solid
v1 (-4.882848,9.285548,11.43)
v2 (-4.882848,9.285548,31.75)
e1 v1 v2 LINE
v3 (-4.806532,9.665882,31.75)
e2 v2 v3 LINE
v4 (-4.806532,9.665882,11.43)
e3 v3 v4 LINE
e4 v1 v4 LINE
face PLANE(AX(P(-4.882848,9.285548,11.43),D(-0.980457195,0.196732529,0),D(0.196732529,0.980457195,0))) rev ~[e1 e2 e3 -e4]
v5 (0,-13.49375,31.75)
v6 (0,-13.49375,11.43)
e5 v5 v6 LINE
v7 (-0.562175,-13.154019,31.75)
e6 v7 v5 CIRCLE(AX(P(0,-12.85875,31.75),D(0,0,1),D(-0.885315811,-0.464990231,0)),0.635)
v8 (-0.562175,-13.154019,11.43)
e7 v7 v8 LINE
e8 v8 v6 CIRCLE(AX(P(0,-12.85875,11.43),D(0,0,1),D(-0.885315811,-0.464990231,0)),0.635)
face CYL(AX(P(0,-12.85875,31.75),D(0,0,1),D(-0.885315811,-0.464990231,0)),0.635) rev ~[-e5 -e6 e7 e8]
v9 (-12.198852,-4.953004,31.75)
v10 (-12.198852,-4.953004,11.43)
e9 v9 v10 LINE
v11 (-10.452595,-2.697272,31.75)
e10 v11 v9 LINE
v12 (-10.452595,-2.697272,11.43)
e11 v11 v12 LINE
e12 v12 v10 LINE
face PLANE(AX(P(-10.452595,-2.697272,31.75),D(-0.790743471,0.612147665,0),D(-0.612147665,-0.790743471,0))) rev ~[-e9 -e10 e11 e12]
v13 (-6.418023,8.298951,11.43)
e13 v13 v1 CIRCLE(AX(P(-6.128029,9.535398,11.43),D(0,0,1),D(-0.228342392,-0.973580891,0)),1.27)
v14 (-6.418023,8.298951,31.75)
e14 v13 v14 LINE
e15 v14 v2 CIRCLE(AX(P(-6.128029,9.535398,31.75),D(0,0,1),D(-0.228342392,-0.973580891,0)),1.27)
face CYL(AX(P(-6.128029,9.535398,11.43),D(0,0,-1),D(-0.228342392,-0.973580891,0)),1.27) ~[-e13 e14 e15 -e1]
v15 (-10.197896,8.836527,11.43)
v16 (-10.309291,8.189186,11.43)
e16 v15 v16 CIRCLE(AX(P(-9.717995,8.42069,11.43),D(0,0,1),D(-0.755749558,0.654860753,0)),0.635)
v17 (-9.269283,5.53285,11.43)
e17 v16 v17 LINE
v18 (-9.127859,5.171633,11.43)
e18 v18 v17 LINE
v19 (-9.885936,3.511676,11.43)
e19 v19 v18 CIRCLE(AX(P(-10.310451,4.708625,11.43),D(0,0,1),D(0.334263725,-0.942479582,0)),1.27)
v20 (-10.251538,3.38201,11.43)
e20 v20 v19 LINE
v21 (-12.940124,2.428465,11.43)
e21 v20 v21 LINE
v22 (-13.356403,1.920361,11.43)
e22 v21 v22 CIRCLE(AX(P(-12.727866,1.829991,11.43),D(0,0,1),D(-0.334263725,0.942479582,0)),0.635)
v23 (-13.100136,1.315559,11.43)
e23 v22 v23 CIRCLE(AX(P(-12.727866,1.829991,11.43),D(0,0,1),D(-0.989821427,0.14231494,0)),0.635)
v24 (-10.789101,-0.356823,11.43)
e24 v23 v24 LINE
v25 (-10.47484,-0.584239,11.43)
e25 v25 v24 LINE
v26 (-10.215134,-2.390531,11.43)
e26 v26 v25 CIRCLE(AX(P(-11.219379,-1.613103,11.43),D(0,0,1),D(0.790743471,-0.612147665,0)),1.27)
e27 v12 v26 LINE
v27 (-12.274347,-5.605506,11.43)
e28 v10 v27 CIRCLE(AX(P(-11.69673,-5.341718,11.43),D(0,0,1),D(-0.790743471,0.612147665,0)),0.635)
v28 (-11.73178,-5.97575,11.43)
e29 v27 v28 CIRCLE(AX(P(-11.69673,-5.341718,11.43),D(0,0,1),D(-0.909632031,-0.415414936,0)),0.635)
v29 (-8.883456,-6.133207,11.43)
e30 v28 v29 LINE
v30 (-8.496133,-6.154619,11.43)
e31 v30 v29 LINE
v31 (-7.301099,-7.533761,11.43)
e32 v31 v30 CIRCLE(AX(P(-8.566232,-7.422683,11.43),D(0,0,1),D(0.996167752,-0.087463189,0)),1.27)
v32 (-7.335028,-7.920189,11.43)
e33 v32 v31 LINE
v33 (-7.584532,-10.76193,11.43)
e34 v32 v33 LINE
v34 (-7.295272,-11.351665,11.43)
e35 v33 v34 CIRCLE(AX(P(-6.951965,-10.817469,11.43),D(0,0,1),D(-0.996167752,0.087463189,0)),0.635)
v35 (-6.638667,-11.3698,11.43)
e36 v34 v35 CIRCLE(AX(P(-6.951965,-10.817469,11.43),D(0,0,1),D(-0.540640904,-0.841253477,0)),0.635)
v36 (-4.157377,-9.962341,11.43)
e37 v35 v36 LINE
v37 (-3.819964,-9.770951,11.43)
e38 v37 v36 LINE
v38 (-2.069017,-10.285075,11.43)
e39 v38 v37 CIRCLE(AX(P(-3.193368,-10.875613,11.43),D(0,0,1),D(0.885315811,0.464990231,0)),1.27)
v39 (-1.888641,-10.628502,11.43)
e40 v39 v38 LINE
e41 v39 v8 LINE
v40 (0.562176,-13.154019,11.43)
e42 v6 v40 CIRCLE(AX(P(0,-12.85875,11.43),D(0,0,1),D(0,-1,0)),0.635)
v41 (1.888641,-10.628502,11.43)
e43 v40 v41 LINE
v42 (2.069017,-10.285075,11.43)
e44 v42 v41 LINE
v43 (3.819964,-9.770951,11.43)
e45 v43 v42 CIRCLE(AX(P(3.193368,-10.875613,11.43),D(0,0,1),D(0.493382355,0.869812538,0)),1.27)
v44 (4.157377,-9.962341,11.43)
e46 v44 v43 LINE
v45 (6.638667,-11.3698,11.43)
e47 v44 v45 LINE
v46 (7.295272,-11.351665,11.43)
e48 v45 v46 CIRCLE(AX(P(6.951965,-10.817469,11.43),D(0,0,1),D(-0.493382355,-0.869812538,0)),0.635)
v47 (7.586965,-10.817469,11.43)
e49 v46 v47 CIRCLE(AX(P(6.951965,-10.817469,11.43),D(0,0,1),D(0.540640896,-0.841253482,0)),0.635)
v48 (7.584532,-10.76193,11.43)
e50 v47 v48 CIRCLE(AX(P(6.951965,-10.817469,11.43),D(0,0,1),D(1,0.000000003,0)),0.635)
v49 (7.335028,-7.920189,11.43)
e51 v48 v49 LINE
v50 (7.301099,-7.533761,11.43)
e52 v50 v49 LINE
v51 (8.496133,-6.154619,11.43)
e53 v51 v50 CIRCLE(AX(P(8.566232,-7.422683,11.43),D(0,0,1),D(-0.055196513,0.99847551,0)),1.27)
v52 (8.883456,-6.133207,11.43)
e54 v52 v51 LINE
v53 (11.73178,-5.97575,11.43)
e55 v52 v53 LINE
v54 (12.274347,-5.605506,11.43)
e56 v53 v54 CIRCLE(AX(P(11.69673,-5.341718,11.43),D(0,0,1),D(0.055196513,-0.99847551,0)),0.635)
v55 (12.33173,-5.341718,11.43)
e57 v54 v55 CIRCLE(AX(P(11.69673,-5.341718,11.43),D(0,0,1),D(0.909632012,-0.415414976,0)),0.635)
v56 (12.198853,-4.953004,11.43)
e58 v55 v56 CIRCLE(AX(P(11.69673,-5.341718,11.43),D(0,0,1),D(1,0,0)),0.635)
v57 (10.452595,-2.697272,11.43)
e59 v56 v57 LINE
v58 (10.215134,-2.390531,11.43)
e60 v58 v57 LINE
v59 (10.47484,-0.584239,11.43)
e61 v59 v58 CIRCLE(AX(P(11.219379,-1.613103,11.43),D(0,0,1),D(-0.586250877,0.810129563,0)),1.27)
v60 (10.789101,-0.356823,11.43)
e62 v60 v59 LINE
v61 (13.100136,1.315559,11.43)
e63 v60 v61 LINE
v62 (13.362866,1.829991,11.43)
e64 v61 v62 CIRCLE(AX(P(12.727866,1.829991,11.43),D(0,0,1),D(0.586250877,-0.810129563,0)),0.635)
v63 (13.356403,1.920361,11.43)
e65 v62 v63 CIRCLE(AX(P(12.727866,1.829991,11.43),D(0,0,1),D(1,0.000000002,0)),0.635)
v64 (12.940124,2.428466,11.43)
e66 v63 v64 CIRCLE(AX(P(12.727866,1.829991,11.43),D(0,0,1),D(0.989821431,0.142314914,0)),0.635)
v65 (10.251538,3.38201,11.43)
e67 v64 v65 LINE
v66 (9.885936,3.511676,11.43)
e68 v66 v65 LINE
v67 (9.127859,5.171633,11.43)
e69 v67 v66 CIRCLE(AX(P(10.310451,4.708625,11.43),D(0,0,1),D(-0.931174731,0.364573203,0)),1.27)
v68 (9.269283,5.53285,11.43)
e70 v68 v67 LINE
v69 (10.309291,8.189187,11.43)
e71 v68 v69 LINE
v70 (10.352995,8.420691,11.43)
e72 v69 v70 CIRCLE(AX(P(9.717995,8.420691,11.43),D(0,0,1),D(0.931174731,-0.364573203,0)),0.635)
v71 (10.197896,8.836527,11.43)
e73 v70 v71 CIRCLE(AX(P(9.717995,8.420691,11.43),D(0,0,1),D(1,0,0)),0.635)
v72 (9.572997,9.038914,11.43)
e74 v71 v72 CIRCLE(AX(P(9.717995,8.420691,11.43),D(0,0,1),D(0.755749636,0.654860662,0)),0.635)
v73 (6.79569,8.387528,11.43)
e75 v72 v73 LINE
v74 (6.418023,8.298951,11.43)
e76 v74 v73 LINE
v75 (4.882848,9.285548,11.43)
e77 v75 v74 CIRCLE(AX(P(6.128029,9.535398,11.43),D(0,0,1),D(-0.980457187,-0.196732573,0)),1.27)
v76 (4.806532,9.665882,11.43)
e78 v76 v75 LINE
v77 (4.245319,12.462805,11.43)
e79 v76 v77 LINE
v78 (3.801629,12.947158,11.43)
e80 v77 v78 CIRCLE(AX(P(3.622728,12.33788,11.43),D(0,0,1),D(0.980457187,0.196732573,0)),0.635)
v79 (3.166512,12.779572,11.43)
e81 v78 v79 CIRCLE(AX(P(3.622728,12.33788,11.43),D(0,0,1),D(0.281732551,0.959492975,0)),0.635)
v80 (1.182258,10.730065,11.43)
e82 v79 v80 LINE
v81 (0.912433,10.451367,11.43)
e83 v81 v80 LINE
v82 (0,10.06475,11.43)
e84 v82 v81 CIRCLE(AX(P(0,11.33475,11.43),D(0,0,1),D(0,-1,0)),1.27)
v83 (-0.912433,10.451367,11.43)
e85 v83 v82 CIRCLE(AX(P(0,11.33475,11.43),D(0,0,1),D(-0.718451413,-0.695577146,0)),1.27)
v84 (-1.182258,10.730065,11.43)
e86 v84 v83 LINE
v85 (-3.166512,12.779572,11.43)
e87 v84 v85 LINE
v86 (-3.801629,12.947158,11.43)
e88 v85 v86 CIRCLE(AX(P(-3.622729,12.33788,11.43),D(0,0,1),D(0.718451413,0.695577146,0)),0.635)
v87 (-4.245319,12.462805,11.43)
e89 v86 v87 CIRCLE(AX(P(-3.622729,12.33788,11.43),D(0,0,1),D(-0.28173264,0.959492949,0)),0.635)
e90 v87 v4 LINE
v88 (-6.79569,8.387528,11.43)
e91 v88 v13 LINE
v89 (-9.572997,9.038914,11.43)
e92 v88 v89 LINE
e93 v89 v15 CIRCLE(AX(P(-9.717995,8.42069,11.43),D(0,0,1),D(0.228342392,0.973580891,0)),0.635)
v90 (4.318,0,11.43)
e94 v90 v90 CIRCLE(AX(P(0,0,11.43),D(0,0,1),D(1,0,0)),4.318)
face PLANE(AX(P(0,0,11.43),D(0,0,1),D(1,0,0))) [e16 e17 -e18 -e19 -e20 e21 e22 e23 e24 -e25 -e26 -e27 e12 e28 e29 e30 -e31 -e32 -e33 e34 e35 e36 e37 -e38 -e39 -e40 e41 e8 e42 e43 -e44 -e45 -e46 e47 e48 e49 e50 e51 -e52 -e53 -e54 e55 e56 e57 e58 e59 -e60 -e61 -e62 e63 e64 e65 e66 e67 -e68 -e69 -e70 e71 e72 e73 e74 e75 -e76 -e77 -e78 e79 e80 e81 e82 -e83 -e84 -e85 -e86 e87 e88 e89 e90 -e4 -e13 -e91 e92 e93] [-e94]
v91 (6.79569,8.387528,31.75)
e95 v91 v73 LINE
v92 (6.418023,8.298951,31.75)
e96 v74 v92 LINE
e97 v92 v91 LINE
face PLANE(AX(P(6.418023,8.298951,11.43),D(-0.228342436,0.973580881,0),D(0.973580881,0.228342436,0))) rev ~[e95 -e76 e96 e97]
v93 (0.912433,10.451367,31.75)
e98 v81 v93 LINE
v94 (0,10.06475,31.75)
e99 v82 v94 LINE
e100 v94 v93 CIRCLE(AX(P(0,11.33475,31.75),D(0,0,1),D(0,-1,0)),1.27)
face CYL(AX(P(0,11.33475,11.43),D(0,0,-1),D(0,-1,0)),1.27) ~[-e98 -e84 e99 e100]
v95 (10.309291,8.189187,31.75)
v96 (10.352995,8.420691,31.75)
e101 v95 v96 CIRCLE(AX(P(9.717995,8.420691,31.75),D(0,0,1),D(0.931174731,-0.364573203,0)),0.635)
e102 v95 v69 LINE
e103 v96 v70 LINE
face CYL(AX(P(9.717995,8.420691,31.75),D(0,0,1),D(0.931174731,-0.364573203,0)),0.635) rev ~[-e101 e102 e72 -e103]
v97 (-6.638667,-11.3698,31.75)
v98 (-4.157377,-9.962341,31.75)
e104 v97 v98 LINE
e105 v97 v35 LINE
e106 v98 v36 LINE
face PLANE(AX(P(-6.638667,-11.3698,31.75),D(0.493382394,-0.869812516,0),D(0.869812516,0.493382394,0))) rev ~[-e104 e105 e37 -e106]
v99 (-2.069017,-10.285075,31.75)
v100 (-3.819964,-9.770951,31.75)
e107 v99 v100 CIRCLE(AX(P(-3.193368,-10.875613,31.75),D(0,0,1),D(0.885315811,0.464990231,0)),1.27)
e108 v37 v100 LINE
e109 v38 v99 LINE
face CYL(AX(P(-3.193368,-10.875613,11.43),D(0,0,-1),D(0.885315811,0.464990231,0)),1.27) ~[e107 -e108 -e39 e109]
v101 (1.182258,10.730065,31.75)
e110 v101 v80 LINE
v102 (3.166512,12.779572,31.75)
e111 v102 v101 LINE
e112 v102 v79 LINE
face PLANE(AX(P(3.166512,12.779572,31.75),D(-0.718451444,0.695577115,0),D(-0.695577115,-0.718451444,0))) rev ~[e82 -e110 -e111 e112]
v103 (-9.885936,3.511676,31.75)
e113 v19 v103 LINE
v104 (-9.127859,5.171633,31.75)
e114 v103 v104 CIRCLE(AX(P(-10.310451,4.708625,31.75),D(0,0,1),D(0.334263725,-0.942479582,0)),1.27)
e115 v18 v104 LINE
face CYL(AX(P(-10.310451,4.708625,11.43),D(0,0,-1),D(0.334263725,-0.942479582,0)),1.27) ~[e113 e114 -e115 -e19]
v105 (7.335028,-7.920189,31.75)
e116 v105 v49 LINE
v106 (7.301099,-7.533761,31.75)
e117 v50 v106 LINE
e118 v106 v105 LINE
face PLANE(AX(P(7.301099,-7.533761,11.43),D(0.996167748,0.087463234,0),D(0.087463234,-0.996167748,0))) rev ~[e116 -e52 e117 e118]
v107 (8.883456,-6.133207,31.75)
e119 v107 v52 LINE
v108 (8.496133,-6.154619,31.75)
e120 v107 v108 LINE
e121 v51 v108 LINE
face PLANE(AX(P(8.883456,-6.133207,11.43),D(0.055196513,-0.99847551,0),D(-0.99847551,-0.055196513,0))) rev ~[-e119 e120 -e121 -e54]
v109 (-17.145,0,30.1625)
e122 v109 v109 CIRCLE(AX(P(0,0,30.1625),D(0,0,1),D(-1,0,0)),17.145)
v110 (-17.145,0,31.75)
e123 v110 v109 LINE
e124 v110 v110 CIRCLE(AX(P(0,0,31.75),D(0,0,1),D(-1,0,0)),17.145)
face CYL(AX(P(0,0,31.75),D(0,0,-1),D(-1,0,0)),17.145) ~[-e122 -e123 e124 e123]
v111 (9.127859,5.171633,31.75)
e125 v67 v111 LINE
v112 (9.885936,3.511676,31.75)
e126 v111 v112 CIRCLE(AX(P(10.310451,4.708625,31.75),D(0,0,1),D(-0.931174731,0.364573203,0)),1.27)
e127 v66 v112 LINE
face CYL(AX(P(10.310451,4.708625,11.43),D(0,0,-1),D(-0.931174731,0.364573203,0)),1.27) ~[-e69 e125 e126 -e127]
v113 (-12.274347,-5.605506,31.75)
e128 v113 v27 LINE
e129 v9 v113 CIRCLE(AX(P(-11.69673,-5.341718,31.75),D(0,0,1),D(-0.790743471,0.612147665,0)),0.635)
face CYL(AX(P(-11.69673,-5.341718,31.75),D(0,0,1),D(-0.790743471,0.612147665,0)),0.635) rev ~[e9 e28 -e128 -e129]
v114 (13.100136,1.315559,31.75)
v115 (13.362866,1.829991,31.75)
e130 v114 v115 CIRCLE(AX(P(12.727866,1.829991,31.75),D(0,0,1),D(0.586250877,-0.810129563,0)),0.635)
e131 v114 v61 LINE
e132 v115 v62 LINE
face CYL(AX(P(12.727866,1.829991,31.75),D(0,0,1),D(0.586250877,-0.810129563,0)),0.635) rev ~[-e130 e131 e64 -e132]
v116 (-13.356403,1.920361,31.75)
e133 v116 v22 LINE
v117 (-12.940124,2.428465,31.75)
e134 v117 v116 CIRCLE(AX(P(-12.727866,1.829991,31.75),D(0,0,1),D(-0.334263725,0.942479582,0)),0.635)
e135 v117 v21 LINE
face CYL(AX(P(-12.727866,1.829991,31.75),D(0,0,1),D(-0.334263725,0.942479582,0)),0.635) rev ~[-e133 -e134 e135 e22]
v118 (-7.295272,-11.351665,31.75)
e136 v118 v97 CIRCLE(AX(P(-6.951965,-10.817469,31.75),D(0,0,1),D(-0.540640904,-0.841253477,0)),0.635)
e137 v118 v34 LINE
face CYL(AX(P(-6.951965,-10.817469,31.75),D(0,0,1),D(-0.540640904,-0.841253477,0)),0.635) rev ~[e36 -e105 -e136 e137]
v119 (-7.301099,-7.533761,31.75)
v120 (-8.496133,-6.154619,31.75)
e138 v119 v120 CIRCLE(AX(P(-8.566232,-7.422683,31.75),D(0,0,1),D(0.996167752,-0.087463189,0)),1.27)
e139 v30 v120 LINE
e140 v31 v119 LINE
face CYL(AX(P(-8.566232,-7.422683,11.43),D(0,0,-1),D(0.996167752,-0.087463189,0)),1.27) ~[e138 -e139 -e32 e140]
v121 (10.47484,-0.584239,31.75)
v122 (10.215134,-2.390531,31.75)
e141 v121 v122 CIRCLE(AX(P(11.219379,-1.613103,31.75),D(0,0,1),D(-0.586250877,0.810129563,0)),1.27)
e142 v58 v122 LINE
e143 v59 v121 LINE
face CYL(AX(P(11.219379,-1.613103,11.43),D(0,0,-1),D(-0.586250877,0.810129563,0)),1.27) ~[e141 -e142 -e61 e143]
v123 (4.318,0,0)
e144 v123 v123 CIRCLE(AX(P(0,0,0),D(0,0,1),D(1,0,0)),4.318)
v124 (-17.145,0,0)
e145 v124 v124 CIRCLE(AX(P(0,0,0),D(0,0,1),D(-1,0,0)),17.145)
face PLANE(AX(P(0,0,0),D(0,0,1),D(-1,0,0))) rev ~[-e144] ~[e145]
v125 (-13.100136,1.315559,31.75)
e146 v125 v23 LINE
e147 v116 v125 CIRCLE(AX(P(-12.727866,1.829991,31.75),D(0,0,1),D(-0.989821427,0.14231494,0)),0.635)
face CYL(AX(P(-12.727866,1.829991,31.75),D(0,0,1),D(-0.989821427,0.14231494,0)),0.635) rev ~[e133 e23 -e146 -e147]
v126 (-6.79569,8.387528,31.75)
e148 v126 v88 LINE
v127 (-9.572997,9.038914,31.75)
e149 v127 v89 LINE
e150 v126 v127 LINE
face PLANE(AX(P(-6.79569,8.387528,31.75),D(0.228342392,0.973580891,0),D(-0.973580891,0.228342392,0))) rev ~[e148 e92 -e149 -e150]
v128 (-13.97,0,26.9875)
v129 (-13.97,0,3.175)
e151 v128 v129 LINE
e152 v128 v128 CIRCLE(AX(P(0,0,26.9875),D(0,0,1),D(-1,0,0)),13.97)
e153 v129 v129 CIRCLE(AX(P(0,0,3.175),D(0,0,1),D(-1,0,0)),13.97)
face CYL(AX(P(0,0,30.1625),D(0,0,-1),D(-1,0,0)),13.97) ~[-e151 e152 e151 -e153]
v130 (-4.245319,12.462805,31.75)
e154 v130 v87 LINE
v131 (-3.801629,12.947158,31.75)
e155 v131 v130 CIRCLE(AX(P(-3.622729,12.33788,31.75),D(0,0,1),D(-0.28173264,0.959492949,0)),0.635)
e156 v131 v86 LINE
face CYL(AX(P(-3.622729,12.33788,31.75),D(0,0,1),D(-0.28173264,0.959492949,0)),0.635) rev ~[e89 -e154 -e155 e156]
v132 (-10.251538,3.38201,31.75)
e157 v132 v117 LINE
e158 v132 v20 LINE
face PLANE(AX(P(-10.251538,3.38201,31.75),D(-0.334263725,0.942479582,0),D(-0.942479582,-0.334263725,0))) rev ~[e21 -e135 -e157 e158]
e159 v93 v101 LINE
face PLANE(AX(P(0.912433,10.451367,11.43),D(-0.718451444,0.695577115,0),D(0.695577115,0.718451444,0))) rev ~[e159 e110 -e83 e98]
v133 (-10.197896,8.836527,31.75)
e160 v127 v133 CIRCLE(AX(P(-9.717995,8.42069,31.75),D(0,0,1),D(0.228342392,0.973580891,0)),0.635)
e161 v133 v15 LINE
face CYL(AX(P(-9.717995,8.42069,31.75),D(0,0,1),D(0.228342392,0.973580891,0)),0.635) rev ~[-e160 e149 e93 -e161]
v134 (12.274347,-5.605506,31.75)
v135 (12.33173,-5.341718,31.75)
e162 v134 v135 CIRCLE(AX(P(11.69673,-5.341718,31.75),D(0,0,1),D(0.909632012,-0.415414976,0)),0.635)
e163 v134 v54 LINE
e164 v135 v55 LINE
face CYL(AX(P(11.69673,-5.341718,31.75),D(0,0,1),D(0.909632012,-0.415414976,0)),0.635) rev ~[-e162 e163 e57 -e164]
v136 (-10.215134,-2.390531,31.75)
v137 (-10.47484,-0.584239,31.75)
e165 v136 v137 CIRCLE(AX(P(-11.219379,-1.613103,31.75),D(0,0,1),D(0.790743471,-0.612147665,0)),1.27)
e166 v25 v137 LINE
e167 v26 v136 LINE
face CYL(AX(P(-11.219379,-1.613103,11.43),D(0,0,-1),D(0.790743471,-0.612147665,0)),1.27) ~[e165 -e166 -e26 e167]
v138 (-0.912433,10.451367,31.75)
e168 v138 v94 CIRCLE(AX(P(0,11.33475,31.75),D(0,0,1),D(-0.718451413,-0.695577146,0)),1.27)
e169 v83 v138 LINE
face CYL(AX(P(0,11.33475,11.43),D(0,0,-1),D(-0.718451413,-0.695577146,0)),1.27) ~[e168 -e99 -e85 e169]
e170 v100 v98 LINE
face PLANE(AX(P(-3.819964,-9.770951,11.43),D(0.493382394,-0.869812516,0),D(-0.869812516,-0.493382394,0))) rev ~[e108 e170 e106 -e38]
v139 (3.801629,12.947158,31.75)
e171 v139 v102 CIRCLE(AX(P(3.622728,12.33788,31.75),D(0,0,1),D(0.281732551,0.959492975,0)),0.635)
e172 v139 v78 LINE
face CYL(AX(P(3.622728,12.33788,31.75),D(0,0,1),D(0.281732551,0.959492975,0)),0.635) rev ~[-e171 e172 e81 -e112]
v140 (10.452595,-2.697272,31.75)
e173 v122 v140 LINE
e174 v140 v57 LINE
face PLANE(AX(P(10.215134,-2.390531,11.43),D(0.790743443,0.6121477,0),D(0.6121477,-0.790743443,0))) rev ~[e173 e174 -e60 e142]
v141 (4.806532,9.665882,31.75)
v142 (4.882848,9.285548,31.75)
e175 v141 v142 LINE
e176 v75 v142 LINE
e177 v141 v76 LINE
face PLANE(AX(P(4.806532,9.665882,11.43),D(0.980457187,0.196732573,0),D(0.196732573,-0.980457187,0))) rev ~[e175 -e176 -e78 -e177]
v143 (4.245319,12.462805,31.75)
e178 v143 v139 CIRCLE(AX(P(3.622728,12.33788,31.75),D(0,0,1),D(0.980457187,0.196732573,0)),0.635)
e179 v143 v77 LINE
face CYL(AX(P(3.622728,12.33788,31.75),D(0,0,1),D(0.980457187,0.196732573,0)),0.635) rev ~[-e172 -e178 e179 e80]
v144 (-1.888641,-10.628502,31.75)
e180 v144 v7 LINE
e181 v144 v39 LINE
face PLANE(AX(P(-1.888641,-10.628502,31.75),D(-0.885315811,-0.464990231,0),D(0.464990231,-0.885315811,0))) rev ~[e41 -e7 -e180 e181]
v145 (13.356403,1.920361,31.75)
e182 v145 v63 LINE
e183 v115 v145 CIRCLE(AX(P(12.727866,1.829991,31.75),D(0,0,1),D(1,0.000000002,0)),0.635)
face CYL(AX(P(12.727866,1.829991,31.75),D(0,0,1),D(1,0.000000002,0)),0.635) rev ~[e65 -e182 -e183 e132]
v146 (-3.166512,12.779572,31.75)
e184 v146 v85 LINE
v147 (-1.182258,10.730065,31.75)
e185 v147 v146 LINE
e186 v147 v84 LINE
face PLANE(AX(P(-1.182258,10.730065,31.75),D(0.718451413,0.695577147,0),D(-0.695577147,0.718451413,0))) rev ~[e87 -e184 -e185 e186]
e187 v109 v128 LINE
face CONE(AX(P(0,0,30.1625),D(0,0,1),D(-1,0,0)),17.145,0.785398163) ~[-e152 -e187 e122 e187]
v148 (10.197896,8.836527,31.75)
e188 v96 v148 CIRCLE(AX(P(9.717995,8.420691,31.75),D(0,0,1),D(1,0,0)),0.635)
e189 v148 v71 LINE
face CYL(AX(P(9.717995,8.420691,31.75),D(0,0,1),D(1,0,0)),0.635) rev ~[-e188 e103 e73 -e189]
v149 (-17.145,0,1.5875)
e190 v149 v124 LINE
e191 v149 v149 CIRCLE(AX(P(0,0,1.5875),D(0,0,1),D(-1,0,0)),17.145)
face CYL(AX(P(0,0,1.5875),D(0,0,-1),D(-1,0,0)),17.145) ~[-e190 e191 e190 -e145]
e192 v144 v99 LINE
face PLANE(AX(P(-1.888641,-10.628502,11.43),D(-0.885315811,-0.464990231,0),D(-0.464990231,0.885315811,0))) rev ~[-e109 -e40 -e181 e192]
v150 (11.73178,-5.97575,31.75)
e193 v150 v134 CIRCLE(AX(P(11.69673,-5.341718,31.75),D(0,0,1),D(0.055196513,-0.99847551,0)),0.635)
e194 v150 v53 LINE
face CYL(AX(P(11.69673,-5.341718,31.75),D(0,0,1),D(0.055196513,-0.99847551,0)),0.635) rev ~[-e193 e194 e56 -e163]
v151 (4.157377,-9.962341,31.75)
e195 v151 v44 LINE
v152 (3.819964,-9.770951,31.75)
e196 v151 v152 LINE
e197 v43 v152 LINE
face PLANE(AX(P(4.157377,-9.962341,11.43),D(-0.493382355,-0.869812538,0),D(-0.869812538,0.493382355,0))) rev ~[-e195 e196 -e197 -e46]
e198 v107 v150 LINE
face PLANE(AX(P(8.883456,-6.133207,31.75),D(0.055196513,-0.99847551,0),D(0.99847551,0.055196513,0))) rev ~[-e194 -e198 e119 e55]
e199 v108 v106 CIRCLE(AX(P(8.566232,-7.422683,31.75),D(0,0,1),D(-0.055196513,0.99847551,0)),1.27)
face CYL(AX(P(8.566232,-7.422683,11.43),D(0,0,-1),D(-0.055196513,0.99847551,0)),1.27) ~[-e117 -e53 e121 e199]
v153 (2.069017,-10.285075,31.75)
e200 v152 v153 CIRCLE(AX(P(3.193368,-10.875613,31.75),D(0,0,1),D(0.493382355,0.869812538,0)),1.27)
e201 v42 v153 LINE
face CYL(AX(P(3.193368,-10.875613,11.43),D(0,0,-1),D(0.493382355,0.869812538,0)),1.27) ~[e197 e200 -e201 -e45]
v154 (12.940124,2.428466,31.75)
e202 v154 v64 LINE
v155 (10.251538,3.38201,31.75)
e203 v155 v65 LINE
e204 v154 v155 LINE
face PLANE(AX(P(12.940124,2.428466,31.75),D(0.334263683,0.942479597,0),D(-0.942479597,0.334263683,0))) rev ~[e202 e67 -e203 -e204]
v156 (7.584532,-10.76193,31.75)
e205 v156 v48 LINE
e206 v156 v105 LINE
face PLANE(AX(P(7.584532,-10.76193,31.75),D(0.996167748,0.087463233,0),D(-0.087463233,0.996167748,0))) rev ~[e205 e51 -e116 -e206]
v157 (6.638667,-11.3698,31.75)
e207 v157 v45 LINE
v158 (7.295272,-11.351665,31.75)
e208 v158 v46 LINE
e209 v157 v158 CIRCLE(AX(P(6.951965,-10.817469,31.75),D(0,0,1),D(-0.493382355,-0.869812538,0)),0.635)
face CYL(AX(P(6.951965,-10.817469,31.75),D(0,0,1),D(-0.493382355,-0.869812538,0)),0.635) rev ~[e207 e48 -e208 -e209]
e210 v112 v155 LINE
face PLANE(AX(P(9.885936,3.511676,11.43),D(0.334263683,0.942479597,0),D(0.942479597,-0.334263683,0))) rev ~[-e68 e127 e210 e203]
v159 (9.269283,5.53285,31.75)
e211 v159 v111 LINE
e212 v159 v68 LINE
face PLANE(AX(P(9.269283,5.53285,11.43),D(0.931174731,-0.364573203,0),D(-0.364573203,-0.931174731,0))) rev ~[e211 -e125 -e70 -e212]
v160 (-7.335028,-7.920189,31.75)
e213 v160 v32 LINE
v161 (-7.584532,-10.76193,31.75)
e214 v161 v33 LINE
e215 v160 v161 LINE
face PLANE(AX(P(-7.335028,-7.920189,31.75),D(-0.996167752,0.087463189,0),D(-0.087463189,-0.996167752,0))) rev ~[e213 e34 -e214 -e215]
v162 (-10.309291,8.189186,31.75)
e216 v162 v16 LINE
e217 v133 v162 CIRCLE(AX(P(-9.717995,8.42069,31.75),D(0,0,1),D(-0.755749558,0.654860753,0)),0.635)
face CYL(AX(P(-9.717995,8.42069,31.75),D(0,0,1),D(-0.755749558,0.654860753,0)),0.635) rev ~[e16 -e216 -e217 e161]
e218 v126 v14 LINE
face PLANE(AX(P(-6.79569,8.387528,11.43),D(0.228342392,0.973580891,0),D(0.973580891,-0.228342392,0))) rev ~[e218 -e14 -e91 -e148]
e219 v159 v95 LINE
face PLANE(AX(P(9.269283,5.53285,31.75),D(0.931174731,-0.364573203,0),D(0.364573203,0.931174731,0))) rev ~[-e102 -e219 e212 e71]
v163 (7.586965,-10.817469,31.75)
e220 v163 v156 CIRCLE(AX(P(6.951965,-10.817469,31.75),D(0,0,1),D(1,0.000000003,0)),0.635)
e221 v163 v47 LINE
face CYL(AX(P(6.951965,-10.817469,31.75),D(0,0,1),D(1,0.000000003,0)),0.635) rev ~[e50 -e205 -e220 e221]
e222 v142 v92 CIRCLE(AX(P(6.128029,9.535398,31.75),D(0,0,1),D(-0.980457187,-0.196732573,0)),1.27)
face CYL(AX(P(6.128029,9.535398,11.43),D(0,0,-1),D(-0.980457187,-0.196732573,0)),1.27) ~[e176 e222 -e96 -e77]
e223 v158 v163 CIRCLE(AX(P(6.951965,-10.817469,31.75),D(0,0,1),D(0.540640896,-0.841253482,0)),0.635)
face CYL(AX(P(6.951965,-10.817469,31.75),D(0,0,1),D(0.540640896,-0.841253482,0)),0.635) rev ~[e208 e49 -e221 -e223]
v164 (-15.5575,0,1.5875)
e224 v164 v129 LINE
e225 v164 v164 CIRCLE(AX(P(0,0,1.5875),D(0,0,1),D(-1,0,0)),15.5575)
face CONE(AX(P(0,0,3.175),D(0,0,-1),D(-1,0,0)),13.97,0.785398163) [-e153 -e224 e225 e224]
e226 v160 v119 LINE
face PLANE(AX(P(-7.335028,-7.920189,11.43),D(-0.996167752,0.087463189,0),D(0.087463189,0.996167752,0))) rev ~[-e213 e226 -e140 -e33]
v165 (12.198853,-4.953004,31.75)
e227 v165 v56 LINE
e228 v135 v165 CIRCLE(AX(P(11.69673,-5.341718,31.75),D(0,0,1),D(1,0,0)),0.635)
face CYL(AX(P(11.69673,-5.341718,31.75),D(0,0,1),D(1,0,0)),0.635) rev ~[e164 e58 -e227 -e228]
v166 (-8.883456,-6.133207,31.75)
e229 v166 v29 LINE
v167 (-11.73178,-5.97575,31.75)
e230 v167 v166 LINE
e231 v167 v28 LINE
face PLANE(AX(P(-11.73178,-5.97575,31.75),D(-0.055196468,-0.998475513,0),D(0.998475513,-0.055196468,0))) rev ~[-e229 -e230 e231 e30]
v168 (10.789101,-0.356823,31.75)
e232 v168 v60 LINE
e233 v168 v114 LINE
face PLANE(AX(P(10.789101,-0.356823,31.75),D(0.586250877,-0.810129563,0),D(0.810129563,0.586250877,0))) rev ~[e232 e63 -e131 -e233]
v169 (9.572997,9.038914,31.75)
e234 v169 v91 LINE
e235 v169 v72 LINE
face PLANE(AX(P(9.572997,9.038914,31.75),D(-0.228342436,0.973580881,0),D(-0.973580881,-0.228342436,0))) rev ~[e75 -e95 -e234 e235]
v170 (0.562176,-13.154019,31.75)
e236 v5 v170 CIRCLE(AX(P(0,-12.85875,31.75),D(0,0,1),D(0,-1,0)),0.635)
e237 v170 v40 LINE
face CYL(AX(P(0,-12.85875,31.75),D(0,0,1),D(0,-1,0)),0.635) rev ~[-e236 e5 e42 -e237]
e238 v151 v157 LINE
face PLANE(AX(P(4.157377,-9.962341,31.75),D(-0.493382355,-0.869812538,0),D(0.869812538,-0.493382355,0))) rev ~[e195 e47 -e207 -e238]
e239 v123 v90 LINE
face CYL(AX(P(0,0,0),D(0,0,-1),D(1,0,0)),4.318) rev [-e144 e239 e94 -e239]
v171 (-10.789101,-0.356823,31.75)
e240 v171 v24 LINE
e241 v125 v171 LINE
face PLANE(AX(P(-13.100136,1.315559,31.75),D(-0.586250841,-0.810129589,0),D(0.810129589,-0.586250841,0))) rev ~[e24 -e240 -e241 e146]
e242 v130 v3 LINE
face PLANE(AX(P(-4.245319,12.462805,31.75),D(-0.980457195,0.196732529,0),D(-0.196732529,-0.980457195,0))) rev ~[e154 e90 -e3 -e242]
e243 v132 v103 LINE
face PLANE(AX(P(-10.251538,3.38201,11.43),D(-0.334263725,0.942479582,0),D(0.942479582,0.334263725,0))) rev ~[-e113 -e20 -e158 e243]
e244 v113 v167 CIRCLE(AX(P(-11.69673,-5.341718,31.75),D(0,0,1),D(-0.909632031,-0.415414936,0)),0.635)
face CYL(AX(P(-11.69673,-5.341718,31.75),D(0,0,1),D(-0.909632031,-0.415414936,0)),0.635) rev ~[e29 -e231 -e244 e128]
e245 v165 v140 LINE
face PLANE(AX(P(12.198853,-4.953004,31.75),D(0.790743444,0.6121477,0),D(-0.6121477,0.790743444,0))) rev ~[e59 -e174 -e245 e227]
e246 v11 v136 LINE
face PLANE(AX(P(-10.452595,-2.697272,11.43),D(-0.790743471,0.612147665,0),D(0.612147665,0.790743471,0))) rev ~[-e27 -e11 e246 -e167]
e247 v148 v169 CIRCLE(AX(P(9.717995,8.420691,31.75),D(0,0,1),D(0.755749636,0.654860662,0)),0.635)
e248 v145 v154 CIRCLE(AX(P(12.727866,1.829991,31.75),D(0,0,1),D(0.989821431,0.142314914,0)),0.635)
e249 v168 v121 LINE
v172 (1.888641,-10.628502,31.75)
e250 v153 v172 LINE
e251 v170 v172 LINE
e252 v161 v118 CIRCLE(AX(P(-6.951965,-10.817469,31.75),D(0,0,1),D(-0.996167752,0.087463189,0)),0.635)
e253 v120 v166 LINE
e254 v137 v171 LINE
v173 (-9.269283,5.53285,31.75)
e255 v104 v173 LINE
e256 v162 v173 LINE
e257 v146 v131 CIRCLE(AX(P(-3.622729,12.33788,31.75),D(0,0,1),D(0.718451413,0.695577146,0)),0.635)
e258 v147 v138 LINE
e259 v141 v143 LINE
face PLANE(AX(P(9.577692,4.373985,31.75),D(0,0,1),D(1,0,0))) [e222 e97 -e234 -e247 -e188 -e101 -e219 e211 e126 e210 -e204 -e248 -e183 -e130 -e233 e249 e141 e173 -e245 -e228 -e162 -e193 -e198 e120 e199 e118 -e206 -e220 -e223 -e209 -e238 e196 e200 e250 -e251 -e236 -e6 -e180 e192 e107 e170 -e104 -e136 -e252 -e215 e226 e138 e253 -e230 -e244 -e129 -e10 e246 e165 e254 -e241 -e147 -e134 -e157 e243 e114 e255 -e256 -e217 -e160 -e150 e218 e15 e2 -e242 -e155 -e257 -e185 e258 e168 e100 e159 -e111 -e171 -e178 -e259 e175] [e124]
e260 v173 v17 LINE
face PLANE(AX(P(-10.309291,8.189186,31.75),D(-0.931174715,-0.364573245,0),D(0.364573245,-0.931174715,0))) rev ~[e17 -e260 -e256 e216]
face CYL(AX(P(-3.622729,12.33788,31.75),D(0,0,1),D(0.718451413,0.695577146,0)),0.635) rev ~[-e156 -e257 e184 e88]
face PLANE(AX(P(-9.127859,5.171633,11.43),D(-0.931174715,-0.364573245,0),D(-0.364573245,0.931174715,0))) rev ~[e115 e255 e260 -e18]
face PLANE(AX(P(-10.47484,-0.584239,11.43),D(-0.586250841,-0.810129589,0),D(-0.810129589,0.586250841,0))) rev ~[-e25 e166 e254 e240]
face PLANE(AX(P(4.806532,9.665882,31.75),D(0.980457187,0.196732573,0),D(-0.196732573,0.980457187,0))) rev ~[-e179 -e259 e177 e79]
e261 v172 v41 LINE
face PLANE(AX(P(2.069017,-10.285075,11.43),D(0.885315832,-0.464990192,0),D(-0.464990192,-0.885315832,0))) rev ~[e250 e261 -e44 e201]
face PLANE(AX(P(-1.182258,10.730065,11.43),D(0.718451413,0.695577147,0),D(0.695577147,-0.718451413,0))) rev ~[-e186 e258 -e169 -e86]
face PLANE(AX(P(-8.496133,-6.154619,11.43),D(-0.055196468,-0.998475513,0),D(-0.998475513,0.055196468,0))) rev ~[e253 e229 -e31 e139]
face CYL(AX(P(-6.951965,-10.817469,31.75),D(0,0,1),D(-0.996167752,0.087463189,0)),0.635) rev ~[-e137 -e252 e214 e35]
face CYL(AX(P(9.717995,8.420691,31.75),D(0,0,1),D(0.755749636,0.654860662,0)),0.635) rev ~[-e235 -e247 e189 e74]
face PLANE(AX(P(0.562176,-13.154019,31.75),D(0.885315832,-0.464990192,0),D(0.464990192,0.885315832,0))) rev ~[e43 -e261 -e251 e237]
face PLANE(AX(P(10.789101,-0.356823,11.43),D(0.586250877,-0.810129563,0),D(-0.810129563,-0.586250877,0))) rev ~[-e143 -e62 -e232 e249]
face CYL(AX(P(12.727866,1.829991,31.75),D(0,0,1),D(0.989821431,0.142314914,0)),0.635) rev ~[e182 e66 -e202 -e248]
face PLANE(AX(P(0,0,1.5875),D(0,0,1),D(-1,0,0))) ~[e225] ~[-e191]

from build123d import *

# Parameters (mm, degrees)
F0_R     = 12.7
F0_R_2   = 4.318
F1_DEPTH = 11.43
F5_SIZE  = 1.5875
F7_DEPTH = 20.32
F8_DEPTH = 20.32


with BuildPart() as f1:
    # F0 (on Top) → F1 (new body)
    with BuildSketch(Plane.XY):
        Circle(F0_R)
        Circle(F0_R_2, mode=Mode.SUBTRACT)
    extrude(amount=F1_DEPTH)

    # F2 (on Front) → F3 (revolve)
    with BuildSketch(Plane.XZ):
        Polygon((-17.145, 0), (-7.62, 0), (-7.62, 1.5875), (-10.795, 1.5875), (-10.795, 31.75), (-17.145, 31.75), (-17.145, 30.1625), (-13.97, 30.1625), (-13.97, 26.9875), (-13.97, 1.5875), (-17.145, 1.5875), align=None)
        Polygon((-17.145, 30.1625), (-13.97, 26.9875), (-13.97, 30.1625), align=None)
    revolve(axis=Axis((0, 0, 11.5776285529), (0, 0, 1)))

    # F5
    f5_edges = [f1.edges().sort_by_distance(p)[0] for p in [
        (13.97, 0, 1.5875),
    ]]
    chamfer(f5_edges, length=F5_SIZE)

    # F6 (on face) → F7 (cut, through all)
    with BuildSketch(Plane.XY.offset(31.75)):
        with BuildLine():
            Line((-10.4525954137, -2.6972716061), (-12.1988524903, -4.9530041056))
            ThreePointArc((-12.1988524903, -4.9530041056), (-11.4913314283, -4.7408549365), (-11.0617303864, -5.3417178727))
            ThreePointArc((-11.0617303864, -5.3417178727), (-11.2602854276, -5.8029562036), (-11.7317801436, -5.9757498234))
            Line((-11.7317801436, -5.9757498234), (-8.8834561601, -6.1332072892))
            ThreePointArc((-8.8834561601, -6.1332072892), (-9.8194773853, -4.4844050753), (-10.4525954137, -2.6972716061))
        make_face()
        with BuildLine():
            ThreePointArc((-12.1988524903, -4.9530041056), (-12.3275224072, -5.2687355018), (-12.2743467257, -5.605506357))
            ThreePointArc((-12.2743467257, -5.605506357), (-12.0546549491, -5.8662319406), (-11.7317801436, -5.9757498234))
            ThreePointArc((-11.7317801436, -5.9757498234), (-11.2602854276, -5.8029562036), (-11.0617303864, -5.3417178727))
            ThreePointArc((-11.0617303864, -5.3417178727), (-11.4913314283, -4.7408549365), (-12.1988524903, -4.9530041056))
        make_face()
        with BuildLine():
            Line((-10.2515379451, 3.3820104613), (-12.9401239425, 2.4284653804))
            ThreePointArc((-12.9401239425, 2.4284653804), (-12.361504969, 2.3486470375), (-12.0928664774, 1.8299908459))
            ThreePointArc((-12.0928664774, 1.8299908459), (-12.4390464603, 1.264475154), (-13.1001357616, 1.3155585568))
            Line((-13.1001357616, 1.3155585568), (-10.7891010809, -0.3568232994))
            ThreePointArc((-10.7891010809, -0.3568232994), (-10.6851224667, 1.5362886683), (-10.2515379451, 3.3820104613))
        make_face()
        with BuildLine():
            ThreePointArc((-12.9401239425, 2.4284653804), (-13.2190652412, 2.2324194413), (-13.3564030838, 1.9203608324))
            ThreePointArc((-13.3564030838, 1.9203608324), (-13.3125454969, 1.5822501665), (-13.1001357616, 1.3155585568))
            ThreePointArc((-13.1001357616, 1.3155585568), (-12.4390464603, 1.264475154), (-12.0928664774, 1.8299908459))
            ThreePointArc((-12.0928664774, 1.8299908459), (-12.361504969, 2.3486470375), (-12.9401239425, 2.4284653804))
        make_face()
        with BuildLine():
            Line((-6.7956896128, 8.3875281035), (-9.5729974735, 9.0389142669))
            ThreePointArc((-9.5729974735, 9.0389142669), (-9.2203512646, 8.8151214081), (-9.0829948927, 8.4206904009))
            ThreePointArc((-9.0829948927, 8.4206904009), (-9.6001982975, 7.7967120663), (-10.3092908365, 8.1891863905))
            Line((-10.3092908365, 8.1891863905), (-9.2692826406, 5.5328495668))
            ThreePointArc((-9.2692826406, 5.5328495668), (-8.1583166623, 7.0692216147), (-6.7956896128, 8.3875281035))
        make_face()
        with BuildLine():
            ThreePointArc((-9.5729974735, 9.0389142669), (-9.9136482865, 9.0247969722), (-10.1978958619, 8.8365269791))
            ThreePointArc((-10.1978958619, 8.8365269791), (-10.3437969109, 8.5283789982), (-10.3092908365, 8.1891863905))
            ThreePointArc((-10.3092908365, 8.1891863905), (-9.6001982975, 7.7967120663), (-9.0829948927, 8.4206904009))
            ThreePointArc((-9.0829948927, 8.4206904009), (-9.2203512646, 8.8151214081), (-9.5729974735, 9.0389142669))
        make_face()
        with BuildLine():
            Line((-1.1822578445, 10.7300648362), (-3.1665119462, 12.7795717395))
            ThreePointArc((-3.1665119462, 12.7795717395), (-3.0341189729, 12.5761316197), (-2.9877285936, 12.3378802515))
            ThreePointArc((-2.9877285936, 12.3378802515), (-3.6854985998, 11.7059902877), (-4.2453189127, 12.4628054073))
            Line((-4.2453189127, 12.4628054073), (-4.8065324556, 9.6658817887))
            ThreePointArc((-4.8065324556, 9.6658817887), (-3.0413029616, 10.3577266471), (-1.1822578445, 10.7300648362))
        make_face()
        with BuildLine():
            ThreePointArc((-3.1665119462, 12.7795717395), (-3.4607180661, 12.9518652586), (-3.8016288198, 12.9471582743))
            ThreePointArc((-3.8016288198, 12.9471582743), (-4.090965925, 12.7668077529), (-4.2453189127, 12.4628054073))
            ThreePointArc((-4.2453189127, 12.4628054073), (-3.6854985998, 11.7059902877), (-2.9877285936, 12.3378802515))
            ThreePointArc((-2.9877285936, 12.3378802515), (-3.0341189729, 12.5761316197), (-3.1665119462, 12.7795717395))
        make_face()
        with BuildLine():
            Line((3.0413028854, 10.3577266695), (3.4438282673, 11.7286022581))
            ThreePointArc((3.4438282673, 11.7286022581), (3.008743441, 12.1758697278), (3.1665117699, 12.7795717652))
            Line((3.1665117699, 12.7795717652), (1.1822578227, 10.7300648386))
            ThreePointArc((1.1822578227, 10.7300648386), (2.1199705639, 10.5847886048), (3.0413028854, 10.3577266695))
        make_face()
        with BuildLine():
            ThreePointArc((4.2453187505, 12.462805481), (4.0909657389, 12.766807831), (3.8016286067, 12.9471583368))
            Line((3.8016286067, 12.9471583368), (3.4438282673, 11.7286022581))
            ThreePointArc((3.4438282673, 11.7286022581), (4.0032697568, 11.8295366107), (4.257728437, 12.3378802975))
            ThreePointArc((4.257728437, 12.3378802975), (4.2546183994, 12.4006503178), (4.2453187505, 12.462805481))
        make_face()
        with BuildLine():
            ThreePointArc((4.257728437, 12.3378802975), (4.0032697568, 11.8295366107), (3.4438282673, 11.7286022581))
            Line((3.4438282673, 11.7286022581), (3.0413028854, 10.3577266695))
            ThreePointArc((3.0413028854, 10.3577266695), (3.9391359635, 10.0506334557), (4.806532436, 9.6658817985))
            Line((4.806532436, 9.6658817985), (4.2453187505, 12.462805481))
            ThreePointArc((4.2453187505, 12.462805481), (4.2546183994, 12.4006503178), (4.257728437, 12.3378802975))
        make_face()
        with BuildLine():
            Line((3.4438282673, 11.7286022581), (3.8016286067, 12.9471583368))
            ThreePointArc((3.8016286067, 12.9471583368), (3.4607178673, 12.9518652935), (3.1665117699, 12.7795717652))
            ThreePointArc((3.1665117699, 12.7795717652), (3.008743441, 12.1758697278), (3.4438282673, 11.7286022581))
        make_face()
        with BuildLine():
            Line((-7.335027693, -7.9201889967), (-7.5845315655, -10.7619297844))
            ThreePointArc((-7.5845315655, -10.7619297844), (-6.924168837, -10.1830775705), (-6.3169650428, -10.8174689094))
            ThreePointArc((-6.3169650428, -10.8174689094), (-6.4032533172, -11.1370630929), (-6.6386672228, -11.3697998573))
            Line((-6.6386672228, -11.3697998573), (-4.157376676, -9.9623412998))
            ThreePointArc((-4.157376676, -9.9623412998), (-5.8362176152, -9.0813318928), (-7.335027693, -7.9201889967))
        make_face()
        with BuildLine():
            ThreePointArc((-7.5845315655, -10.7619297844), (-7.52207831, -11.0971041407), (-7.2952720168, -11.3516648675))
            ThreePointArc((-7.2952720168, -11.3516648675), (-6.969496637, -11.4522268501), (-6.6386672228, -11.3697998573))
            ThreePointArc((-6.6386672228, -11.3697998573), (-6.4032533172, -11.1370630929), (-6.3169650428, -10.8174689094))
            ThreePointArc((-6.3169650428, -10.8174689094), (-6.924168837, -10.1830775705), (-7.5845315655, -10.7619297844))
        make_face()
        with BuildLine():
            Line((-1.8886405066, -10.6285023421), (-0.5621754583, -13.1540187967))
            ThreePointArc((-0.5621754583, -13.1540187967), (-0.1520583482, -12.2422248716), (0.6350000816, -12.85875))
            ThreePointArc((0.6350000816, -12.85875), (0.6165252134, -13.0108084161), (0.5621756347, -13.1540187717))
            Line((0.5621756347, -13.1540187717), (1.8886405281, -10.6285023383))
            ThreePointArc((1.8886405281, -10.6285023383), (1.09e-08, -10.795), (-1.8886405066, -10.6285023421))
        make_face()
        with BuildLine():
            ThreePointArc((-0.5621754583, -13.1540187967), (-0.3284274706, -13.4022206459), (8.16e-08, -13.49375))
            ThreePointArc((8.16e-08, -13.49375), (0.3284276459, -13.4022206386), (0.5621756347, -13.1540187717))
            ThreePointArc((0.5621756347, -13.1540187717), (0.6165252134, -13.0108084161), (0.6350000816, -12.85875))
            ThreePointArc((0.6350000816, -12.85875), (-0.1520583482, -12.2422248716), (-0.5621754583, -13.1540187967))
        make_face()
        with BuildLine():
            Line((4.1573766962, -9.9623412914), (6.6386673847, -11.369799783))
            ThreePointArc((6.6386673847, -11.369799783), (6.6086582491, -10.2832728355), (7.5845317003, -10.7619296679))
            Line((7.5845317003, -10.7619296679), (7.3350277091, -7.9201889818))
            ThreePointArc((7.3350277091, -7.9201889818), (5.8362176336, -9.081331881), (4.1573766962, -9.9623412914))
        make_face()
        with BuildLine():
            ThreePointArc((6.6386673847, -11.369799783), (6.9694967855, -11.4522267615), (7.2952721492, -11.3516647824))
            ThreePointArc((7.2952721492, -11.3516647824), (7.5092913527, -11.1217919017), (7.5869651801, -10.8174688212))
            ThreePointArc((7.5869651801, -10.8174688212), (7.5863565184, -10.7896726012), (7.5845317003, -10.7619296679))
            ThreePointArc((7.5845317003, -10.7619296679), (6.6086582491, -10.2832728355), (6.6386673847, -11.369799783))
        make_face()
        with BuildLine():
            Line((8.8834561725, -6.1332072712), (11.7317802397, -5.9757496733))
            ThreePointArc((11.7317802397, -5.9757496733), (11.1191141312, -5.0779292038), (12.1988525408, -4.9530039347))
            Line((12.1988525408, -4.9530039347), (10.4525954192, -2.6972715849))
            ThreePointArc((10.4525954192, -2.6972715849), (9.8194773944, -4.4844050554), (8.8834561725, -6.1332072712))
        make_face()
        with BuildLine():
            ThreePointArc((11.7317802397, -5.9757496733), (12.0546550169, -5.866231792), (12.2743467819, -5.6055062342))
            ThreePointArc((12.2743467819, -5.6055062342), (12.3172187168, -5.4766966706), (12.3317304542, -5.3417177242))
            ThreePointArc((12.3317304542, -5.3417177242), (12.2975933857, -5.1363187527), (12.1988525408, -4.9530039347))
            ThreePointArc((12.1988525408, -4.9530039347), (11.1191141312, -5.0779292038), (11.7317802397, -5.9757496733))
        make_face()
        with BuildLine():
            ThreePointArc((13.1001357613, 1.315558735), (12.0993298406, 1.7396210711), (12.9401238926, 2.4284655514))
            Line((12.9401238926, 2.4284655514), (10.2515379382, 3.3820104821))
            ThreePointArc((10.2515379382, 3.3820104821), (10.6582685518, 1.7126985953), (10.795, 0))
            ThreePointArc((10.795, 0), (10.7935251696, -0.178436017), (10.7891010816, -0.3568232775))
            Line((10.7891010816, -0.3568232775), (13.1001357613, 1.315558735))
        make_face()
        with BuildLine():
            ThreePointArc((13.3628664542, 1.8299910074), (13.3612485452, 1.8752914129), (13.3564030629, 1.9203609777))
            ThreePointArc((13.3564030629, 1.9203609777), (13.2190652142, 2.2324196075), (12.9401238926, 2.4284655514))
            ThreePointArc((12.9401238926, 2.4284655514), (12.0993298406, 1.7396210711), (13.1001357613, 1.315558735))
            ThreePointArc((13.1001357613, 1.315558735), (13.2933821525, 1.541171003), (13.3628664542, 1.8299910074))
        make_face()
        with BuildLine():
            ThreePointArc((10.3092907399, 8.1891865402), (9.2380938153, 8.0048539475), (9.572997339, 9.0389143838))
            Line((9.572997339, 9.0389143838), (6.7956895958, 8.3875281173))
            ThreePointArc((6.7956895958, 8.3875281173), (8.158316648, 7.0692216312), (9.2692826294, 5.5328495856))
            Line((9.2692826294, 5.5328495856), (10.3092907399, 8.1891865402))
        make_face()
        with BuildLine():
            ThreePointArc((10.3529947858, 8.4206905243), (10.3129578717, 8.6426002501), (10.1978958049, 8.8365270449))
            ThreePointArc((10.1978958049, 8.8365270449), (9.9136482024, 9.0247970882), (9.572997339, 9.0389143838))
            ThreePointArc((9.572997339, 9.0389143838), (9.2380938153, 8.0048539475), (10.3092907399, 8.1891865402))
            ThreePointArc((10.3092907399, 8.1891865402), (10.3419731231, 8.302893943), (10.3529947858, 8.4206905243))
        make_face()
    extrude(amount=-F7_DEPTH, mode=Mode.SUBTRACT)

    # F4 (on face) → F8 (join, through all)
    with BuildSketch(Plane.XY.offset(11.43)):
        with BuildLine():
            Line((9.8859363825, 3.5116762306), (10.2515379382, 3.3820104821))
            ThreePointArc((10.2515379382, 3.3820104821), (9.8194773853, 4.4844050753), (9.2692826294, 5.5328495856))
            Line((9.2692826294, 5.5328495856), (9.1278593511, 5.1716332867))
            ThreePointArc((9.1278593511, 5.1716332867), (9.155218637, 4.1810482264), (9.8859363825, 3.5116762306))
        make_face()
        with BuildLine():
            ThreePointArc((10.4525954192, -2.6972715849), (10.6851224667, -1.5362886683), (10.7891010816, -0.3568232775))
            Line((10.7891010816, -0.3568232775), (10.474839974, -0.5842385682))
            ThreePointArc((10.474839974, -0.5842385682), (9.9623053531, -1.4323632965), (10.2151344151, -2.390530692))
            Line((10.2151344151, -2.390530692), (10.4525954192, -2.6972715849))
        make_face()
        with BuildLine():
            ThreePointArc((7.3350277091, -7.9201889818), (8.1583166623, -7.0692216147), (8.8834561725, -6.1332072712))
            Line((8.8834561725, -6.1332072712), (8.4961329169, -6.1546188058))
            ThreePointArc((8.4961329169, -6.1546188058), (7.6064305099, -6.5910095934), (7.3010994475, -7.5337610106))
            Line((7.3010994475, -7.5337610106), (7.3350277091, -7.9201889818))
        make_face()
        with BuildLine():
            ThreePointArc((1.8886405281, -10.6285023383), (3.0413029616, -10.3577266471), (4.1573766962, -9.9623412914))
            Line((4.1573766962, -9.9623412914), (3.8199636894, -9.770951059))
            ThreePointArc((3.8199636894, -9.770951059), (2.8355677243, -9.6570569142), (2.0690169925, -10.2850754393))
            Line((2.0690169925, -10.2850754393), (1.8886405281, -10.6285023383))
        make_face()
        with BuildLine():
            Line((-3.8199637387, -9.7709510869), (-4.157376676, -9.9623412998))
            ThreePointArc((-4.157376676, -9.9623412998), (-3.0413029406, -10.3577266533), (-1.8886405066, -10.6285023421))
            Line((-1.8886405066, -10.6285023421), (-2.0690170188, -10.2850753892))
            ThreePointArc((-2.0690170188, -10.2850753892), (-2.8355677786, -9.6570568982), (-3.8199637387, -9.7709510869))
        make_face()
        with BuildLine():
            Line((-8.4961329734, -6.1546188027), (-8.8834561601, -6.1332072892))
            ThreePointArc((-8.8834561601, -6.1332072892), (-8.158316648, -7.0692216312), (-7.335027693, -7.9201889967))
            Line((-7.335027693, -7.9201889967), (-7.3010994426, -7.5337609542))
            ThreePointArc((-7.3010994426, -7.5337609542), (-7.606430547, -6.5910095506), (-8.4961329734, -6.1546188027))
        make_face()
        with BuildLine():
            Line((-10.4748400199, -0.584238535), (-10.7891010809, -0.3568232994))
            ThreePointArc((-10.7891010809, -0.3568232994), (-10.6851224635, -1.53628869), (-10.4525954137, -2.6972716061))
            Line((-10.4525954137, -2.6972716061), (-10.2151343804, -2.3905306473))
            ThreePointArc((-10.2151343804, -2.3905306473), (-9.9623053612, -1.4323632405), (-10.4748400199, -0.584238535))
        make_face()
        with BuildLine():
            Line((-9.1278593717, 5.1716333395), (-9.2692826406, 5.5328495668))
            ThreePointArc((-9.2692826406, 5.5328495668), (-9.8194773944, 4.4844050554), (-10.2515379451, 3.3820104613))
            Line((-10.2515379451, 3.3820104613), (-9.8859363292, 3.5116762495))
            ThreePointArc((-9.8859363292, 3.5116762495), (-9.1552186135, 4.1810482779), (-9.1278593717, 5.1716333395))
        make_face()
        with BuildLine():
            Line((-4.8828478674, 9.2855481697), (-4.8065324556, 9.6658817887))
            ThreePointArc((-4.8065324556, 9.6658817887), (-5.8362176336, 9.081331881), (-6.7956896128, 8.3875281035))
            Line((-6.7956896128, 8.3875281035), (-6.4180233441, 8.2989507494))
            ThreePointArc((-6.4180233441, 8.2989507494), (-5.4414146437, 8.4670065099), (-4.8828478674, 9.2855481697))
        make_face()
        with BuildLine():
            Line((0, 10.06475), (0, 10.795))
            ThreePointArc((0, 10.795), (-0.592019887, 10.7787539843), (-1.1822578445, 10.7300648362))
            Line((-1.1822578445, 10.7300648362), (-0.9124332948, 10.4513670239))
            ThreePointArc((-0.9124332948, 10.4513670239), (-0.4954813924, 10.1653919753), (0, 10.06475))
        make_face()
        with BuildLine():
            ThreePointArc((1.1822578227, 10.7300648386), (0.5920198761, 10.7787539849), (0, 10.795))
            Line((0, 10.795), (0, 10.06475))
            ThreePointArc((0, 10.06475), (0.4954814184, 10.1653919864), (0.9124333342, 10.4513670646))
            Line((0.9124333342, 10.4513670646), (1.1822578227, 10.7300648386))
        make_face()
        with BuildLine():
            ThreePointArc((6.7956895958, 8.3875281173), (5.8362176152, 9.0813318928), (4.806532436, 9.6658817985))
            Line((4.806532436, 9.6658817985), (4.8828478786, 9.2855481142))
            ThreePointArc((4.8828478786, 9.2855481142), (5.4414146913, 8.4670064793), (6.4180233992, 8.2989507623))
            Line((6.4180233992, 8.2989507623), (6.7956895958, 8.3875281173))
        make_face()
    extrude(amount=F8_DEPTH)


solid = f1.part
